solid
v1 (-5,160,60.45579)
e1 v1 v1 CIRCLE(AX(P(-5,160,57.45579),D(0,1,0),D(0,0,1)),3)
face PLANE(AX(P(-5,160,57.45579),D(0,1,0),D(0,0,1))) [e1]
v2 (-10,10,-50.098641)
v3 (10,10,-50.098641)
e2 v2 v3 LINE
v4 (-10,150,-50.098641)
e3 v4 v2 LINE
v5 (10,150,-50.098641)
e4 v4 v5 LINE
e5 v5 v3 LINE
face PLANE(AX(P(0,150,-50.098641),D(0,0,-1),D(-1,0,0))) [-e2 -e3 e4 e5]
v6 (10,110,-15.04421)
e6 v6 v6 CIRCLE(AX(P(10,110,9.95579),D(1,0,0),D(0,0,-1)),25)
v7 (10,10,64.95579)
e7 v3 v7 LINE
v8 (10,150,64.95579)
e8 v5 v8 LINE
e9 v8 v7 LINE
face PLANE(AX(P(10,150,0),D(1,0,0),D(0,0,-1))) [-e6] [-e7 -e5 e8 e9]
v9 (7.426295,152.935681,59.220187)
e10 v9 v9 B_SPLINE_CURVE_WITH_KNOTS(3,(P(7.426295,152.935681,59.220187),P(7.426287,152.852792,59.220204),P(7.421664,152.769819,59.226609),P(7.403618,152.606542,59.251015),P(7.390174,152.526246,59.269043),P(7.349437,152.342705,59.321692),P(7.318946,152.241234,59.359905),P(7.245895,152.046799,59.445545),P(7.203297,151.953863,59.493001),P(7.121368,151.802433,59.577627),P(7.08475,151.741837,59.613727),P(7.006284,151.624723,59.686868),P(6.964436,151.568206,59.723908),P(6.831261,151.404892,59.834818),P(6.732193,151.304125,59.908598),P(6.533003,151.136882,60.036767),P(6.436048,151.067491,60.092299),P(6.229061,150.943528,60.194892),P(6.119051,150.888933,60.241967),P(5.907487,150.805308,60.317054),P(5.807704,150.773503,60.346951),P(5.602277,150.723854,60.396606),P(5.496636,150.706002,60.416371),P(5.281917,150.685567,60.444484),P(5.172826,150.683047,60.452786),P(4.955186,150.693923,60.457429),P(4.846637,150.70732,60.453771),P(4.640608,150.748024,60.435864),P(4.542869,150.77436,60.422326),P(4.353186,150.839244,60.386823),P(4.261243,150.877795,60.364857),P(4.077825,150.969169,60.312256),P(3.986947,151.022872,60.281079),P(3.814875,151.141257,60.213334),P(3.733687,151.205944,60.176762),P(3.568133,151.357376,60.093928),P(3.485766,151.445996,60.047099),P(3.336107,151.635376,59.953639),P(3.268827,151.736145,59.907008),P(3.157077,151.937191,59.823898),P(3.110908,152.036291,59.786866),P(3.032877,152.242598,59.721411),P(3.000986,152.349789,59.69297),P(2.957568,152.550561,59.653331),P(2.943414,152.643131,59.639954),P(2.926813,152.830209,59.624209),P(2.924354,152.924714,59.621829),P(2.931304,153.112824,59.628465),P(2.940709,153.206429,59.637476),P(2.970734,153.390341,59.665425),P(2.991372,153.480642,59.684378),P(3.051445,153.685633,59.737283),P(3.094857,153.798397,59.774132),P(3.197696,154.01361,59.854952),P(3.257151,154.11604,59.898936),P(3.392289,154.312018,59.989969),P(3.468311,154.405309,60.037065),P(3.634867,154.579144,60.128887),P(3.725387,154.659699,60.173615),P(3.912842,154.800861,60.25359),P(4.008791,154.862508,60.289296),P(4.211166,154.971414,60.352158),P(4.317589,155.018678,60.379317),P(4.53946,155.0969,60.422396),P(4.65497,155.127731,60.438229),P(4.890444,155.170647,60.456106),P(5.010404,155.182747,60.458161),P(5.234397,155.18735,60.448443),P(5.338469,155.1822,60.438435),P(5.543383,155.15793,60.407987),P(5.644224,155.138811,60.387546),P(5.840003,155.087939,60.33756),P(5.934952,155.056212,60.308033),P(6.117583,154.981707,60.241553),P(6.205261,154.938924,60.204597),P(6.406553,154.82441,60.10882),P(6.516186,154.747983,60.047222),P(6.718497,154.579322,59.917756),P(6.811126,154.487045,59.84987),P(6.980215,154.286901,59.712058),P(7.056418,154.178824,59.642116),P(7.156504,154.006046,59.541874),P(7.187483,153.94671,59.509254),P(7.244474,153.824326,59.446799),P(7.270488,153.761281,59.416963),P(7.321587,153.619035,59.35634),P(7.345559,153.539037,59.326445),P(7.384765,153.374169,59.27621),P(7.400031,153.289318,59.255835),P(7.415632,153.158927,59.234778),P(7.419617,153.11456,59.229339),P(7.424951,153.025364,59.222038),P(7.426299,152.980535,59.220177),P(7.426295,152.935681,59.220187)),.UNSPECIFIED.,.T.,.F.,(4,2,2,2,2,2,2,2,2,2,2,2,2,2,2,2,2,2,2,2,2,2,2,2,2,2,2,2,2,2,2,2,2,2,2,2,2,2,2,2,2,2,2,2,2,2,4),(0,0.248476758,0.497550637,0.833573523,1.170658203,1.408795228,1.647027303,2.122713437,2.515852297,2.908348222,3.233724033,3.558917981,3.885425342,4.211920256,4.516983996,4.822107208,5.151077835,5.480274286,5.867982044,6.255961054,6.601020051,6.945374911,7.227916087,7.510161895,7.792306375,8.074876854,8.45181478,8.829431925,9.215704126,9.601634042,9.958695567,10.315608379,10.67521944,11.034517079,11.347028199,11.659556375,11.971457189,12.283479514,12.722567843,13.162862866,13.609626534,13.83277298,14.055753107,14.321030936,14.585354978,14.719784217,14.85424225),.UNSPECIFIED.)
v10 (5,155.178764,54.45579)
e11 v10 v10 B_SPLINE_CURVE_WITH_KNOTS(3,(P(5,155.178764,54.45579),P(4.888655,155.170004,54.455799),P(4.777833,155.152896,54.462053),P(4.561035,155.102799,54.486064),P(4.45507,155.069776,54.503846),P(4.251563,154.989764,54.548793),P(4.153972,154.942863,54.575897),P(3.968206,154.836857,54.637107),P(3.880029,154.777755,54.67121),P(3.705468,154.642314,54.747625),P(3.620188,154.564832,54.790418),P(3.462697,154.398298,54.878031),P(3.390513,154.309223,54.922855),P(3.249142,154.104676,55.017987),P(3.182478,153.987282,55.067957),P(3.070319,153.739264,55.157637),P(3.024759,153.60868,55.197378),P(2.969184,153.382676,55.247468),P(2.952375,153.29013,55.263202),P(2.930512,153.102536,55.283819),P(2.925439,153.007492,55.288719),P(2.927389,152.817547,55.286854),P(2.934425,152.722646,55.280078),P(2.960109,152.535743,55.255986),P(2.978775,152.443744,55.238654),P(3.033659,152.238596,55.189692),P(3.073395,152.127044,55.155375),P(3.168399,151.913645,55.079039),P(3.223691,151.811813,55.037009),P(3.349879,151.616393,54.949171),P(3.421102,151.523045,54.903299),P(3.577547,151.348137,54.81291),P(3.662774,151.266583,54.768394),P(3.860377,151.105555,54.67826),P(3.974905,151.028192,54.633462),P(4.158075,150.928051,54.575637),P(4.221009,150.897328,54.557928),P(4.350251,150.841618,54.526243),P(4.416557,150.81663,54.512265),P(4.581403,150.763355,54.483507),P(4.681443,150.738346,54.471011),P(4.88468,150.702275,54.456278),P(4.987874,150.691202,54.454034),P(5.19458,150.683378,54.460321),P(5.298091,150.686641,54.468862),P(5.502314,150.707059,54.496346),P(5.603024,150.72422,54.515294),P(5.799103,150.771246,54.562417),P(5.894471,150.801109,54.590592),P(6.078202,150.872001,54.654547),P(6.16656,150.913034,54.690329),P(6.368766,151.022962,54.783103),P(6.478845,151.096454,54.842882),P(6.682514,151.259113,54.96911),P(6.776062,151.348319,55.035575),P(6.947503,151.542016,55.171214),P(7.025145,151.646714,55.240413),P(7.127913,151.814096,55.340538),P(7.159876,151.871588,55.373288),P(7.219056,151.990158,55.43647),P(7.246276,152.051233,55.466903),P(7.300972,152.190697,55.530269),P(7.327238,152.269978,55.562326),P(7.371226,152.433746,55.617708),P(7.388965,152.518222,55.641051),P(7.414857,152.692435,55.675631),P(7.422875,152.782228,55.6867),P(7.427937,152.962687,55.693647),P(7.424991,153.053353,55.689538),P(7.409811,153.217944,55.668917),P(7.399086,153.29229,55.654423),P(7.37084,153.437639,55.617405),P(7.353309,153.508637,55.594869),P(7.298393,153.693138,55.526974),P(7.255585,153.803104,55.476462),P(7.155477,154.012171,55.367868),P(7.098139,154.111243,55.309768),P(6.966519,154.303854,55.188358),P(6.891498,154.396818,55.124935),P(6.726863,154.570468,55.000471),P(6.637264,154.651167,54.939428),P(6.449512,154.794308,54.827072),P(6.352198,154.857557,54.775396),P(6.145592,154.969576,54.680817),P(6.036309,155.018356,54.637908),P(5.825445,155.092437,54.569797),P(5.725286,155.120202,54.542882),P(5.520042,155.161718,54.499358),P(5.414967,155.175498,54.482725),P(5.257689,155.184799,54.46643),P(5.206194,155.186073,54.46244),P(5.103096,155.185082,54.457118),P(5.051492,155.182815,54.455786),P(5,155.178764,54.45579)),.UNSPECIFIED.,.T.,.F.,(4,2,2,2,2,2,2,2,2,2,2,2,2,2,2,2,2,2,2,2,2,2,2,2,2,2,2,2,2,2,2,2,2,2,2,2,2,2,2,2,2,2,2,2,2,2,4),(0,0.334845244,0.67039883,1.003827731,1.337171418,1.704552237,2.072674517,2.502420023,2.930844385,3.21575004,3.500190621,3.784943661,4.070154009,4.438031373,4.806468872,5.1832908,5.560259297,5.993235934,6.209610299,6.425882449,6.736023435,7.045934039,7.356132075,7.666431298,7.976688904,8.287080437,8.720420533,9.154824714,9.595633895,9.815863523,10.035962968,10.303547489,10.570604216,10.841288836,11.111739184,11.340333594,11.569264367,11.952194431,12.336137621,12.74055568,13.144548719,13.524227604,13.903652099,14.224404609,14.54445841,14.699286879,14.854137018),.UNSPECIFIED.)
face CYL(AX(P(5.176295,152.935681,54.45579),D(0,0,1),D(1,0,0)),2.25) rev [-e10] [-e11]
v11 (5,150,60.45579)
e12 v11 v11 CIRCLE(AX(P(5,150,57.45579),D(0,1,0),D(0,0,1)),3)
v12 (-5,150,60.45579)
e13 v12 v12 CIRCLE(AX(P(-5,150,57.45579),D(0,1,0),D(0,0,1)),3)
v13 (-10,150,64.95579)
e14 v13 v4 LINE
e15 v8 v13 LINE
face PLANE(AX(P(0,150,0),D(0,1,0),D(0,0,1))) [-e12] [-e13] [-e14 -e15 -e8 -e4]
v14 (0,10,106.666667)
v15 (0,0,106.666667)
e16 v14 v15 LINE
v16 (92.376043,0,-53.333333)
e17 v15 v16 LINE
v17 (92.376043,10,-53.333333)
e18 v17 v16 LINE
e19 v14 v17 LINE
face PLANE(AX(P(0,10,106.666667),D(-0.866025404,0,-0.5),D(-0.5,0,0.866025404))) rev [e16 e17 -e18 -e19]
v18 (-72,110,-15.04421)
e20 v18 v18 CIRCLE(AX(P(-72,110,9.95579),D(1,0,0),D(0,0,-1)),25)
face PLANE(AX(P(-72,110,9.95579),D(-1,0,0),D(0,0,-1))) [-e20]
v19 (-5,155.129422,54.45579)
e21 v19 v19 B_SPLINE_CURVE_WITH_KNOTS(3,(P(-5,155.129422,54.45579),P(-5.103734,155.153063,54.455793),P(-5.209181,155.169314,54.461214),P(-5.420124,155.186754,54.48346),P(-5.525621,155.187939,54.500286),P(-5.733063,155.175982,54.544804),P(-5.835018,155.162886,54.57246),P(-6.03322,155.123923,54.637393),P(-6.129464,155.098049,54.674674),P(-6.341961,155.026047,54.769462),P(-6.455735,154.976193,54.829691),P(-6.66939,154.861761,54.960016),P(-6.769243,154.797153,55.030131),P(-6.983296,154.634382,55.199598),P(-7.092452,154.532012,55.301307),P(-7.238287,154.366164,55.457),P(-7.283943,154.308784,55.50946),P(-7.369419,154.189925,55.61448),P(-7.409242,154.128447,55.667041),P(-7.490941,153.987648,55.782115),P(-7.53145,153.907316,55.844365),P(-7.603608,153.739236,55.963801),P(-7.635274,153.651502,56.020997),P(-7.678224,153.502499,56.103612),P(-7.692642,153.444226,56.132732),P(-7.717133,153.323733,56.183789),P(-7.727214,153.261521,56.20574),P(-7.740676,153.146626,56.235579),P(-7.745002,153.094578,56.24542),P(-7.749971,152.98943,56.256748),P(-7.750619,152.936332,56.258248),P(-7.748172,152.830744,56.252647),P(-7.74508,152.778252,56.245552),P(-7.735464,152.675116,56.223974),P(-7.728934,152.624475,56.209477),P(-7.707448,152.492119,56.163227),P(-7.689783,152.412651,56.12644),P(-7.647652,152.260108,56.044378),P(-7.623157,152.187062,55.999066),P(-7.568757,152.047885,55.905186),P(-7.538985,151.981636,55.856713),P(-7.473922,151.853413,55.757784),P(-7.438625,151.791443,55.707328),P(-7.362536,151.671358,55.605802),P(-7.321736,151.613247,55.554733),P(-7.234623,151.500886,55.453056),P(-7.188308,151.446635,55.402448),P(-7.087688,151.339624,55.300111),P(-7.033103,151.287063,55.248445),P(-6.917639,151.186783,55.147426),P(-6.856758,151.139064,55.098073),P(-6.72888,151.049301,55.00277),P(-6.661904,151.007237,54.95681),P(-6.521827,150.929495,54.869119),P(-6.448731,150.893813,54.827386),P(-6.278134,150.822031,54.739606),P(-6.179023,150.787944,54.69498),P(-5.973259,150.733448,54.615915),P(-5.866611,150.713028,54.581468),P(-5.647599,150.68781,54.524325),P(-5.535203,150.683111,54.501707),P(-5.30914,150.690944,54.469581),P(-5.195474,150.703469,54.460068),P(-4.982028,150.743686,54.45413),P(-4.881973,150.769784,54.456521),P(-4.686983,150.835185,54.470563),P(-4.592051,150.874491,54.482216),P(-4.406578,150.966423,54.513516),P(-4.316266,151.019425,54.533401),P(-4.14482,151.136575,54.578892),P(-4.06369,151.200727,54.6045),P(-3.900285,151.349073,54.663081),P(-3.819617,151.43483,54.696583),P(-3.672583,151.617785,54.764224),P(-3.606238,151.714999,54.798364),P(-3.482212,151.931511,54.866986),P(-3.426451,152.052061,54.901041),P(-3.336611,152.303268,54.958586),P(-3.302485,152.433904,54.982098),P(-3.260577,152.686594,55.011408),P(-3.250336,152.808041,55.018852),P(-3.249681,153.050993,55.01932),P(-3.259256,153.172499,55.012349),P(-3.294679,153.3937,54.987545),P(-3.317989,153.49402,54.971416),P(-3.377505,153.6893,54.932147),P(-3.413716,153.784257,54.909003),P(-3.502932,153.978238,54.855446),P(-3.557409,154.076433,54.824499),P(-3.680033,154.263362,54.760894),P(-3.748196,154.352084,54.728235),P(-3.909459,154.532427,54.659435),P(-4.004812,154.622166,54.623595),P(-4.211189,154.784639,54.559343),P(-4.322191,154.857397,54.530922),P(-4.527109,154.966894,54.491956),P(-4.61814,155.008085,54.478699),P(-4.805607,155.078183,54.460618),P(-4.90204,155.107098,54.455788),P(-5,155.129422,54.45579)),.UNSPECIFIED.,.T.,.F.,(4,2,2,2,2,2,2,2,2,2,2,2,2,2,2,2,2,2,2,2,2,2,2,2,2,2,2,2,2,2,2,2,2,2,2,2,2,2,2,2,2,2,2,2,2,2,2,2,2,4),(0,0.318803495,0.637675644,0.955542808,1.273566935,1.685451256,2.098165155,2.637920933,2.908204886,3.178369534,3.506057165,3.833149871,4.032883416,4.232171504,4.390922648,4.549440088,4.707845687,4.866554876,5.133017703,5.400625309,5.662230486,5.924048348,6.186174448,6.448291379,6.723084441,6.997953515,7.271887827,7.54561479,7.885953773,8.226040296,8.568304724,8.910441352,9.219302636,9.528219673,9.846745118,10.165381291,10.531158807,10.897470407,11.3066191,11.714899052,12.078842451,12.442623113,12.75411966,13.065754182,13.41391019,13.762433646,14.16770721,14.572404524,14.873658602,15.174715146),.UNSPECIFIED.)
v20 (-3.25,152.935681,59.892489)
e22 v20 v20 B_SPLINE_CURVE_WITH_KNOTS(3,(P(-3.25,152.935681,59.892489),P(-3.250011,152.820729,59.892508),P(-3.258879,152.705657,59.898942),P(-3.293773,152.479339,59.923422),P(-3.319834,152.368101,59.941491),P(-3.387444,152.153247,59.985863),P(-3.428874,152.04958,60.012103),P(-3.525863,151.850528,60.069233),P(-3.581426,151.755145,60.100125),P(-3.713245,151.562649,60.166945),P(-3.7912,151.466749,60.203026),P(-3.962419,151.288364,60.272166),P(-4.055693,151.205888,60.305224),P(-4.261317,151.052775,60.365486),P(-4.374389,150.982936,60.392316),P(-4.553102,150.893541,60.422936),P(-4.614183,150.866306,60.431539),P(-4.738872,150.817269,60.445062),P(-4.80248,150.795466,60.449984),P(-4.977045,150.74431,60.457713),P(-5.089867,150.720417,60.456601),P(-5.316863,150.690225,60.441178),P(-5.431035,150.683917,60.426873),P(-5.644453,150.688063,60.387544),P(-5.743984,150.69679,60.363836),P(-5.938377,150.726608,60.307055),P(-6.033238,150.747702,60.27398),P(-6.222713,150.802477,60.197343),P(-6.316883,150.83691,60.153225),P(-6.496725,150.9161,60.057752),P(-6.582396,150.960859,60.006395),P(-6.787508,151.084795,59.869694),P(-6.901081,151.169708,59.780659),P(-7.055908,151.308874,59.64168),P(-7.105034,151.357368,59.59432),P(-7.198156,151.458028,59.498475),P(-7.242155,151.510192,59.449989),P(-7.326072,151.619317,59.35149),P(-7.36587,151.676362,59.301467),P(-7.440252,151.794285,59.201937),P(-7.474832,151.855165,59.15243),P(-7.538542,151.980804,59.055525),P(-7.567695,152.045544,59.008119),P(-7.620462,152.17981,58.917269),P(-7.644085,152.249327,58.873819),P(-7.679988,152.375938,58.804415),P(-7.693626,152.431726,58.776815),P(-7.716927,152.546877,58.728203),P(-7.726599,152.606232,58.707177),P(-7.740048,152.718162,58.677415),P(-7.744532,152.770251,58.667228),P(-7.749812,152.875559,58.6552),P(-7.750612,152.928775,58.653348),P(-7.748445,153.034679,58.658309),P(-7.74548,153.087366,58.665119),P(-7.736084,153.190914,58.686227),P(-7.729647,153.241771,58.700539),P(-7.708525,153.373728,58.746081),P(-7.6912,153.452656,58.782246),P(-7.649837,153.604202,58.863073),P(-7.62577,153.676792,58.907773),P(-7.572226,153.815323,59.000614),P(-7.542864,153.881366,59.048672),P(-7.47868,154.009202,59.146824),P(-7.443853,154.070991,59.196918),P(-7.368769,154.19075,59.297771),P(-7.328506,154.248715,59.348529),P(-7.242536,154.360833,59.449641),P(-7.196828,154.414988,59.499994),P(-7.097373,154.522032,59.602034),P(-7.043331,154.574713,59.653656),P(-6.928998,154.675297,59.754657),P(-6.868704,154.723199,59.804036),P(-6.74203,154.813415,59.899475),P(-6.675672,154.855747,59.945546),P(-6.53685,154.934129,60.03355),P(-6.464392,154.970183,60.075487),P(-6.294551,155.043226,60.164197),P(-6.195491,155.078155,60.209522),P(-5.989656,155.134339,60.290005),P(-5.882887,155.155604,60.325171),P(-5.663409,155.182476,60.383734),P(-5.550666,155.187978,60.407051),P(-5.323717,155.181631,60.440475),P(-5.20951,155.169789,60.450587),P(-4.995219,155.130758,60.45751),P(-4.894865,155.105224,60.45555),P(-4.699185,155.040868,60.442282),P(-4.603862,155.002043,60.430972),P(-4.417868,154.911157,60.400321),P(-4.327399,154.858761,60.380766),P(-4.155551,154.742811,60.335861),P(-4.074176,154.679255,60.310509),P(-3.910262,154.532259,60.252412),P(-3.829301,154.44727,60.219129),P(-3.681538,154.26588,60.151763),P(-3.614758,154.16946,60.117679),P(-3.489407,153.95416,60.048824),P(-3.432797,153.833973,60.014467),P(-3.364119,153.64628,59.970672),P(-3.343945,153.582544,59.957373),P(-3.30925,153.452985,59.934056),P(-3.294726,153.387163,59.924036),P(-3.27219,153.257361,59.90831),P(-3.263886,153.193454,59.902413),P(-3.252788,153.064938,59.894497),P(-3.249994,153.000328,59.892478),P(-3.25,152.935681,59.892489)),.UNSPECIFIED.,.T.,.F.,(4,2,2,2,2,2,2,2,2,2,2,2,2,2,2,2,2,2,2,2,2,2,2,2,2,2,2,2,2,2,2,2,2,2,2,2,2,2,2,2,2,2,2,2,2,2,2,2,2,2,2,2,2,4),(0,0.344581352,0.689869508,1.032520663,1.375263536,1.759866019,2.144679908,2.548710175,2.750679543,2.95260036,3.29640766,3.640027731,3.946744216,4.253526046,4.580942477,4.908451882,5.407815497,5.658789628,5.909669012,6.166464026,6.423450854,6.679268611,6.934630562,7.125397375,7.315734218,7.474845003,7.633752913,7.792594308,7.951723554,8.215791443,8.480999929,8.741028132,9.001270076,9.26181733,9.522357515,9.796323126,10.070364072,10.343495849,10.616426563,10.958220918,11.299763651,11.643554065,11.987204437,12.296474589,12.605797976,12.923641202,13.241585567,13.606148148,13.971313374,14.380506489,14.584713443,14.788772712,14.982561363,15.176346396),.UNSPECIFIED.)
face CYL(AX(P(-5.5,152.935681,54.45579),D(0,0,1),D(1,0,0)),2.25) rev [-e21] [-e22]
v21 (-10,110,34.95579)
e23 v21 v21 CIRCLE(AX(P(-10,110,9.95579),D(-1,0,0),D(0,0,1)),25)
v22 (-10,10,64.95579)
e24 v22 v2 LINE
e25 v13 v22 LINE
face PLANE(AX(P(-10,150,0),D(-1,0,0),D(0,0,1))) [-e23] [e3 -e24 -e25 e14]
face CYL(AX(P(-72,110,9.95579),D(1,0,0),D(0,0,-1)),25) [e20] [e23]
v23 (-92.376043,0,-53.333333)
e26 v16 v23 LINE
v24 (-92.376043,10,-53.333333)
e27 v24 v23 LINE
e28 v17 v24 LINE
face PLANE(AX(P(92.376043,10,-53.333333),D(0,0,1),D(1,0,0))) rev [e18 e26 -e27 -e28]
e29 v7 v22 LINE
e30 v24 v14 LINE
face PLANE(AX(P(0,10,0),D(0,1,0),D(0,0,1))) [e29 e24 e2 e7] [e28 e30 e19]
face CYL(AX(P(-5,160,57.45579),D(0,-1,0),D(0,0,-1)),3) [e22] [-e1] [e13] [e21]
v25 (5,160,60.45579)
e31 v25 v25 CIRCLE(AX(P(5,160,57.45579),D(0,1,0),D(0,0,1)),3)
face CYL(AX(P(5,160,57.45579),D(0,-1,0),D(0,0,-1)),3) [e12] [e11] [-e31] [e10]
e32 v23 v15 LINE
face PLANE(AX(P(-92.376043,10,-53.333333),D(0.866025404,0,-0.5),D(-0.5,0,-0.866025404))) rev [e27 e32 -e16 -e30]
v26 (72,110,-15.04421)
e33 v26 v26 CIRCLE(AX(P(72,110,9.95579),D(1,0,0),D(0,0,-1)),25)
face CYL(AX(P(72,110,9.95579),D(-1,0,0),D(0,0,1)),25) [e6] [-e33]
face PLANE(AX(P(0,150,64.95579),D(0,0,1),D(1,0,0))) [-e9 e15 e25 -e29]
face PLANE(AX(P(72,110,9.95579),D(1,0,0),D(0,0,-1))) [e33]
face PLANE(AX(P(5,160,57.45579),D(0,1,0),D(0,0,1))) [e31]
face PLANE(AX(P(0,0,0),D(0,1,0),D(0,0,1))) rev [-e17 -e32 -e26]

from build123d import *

# Parameters (mm, degrees)
BOSS_EXTRUDE1_DEPTH    = 10
SKETCH6_W              = 20
SKETCH6_H              = 64.955790415
SKETCH6_H_2            = 50.098640903
BOSS_EXTRUDE4_DEPTH    = 140
SKETCH7_R              = 25
BOSS_EXTRUDE5_DEPTH    = 62
SKETCH12_R             = 3
BOSS_EXTRUDE6_DEPTH    = 10
CUT_EXTRUDE1_START     = 54.455790306
CUT_EXTRUDE1_OUTLINE_R = 2.25
CUT_EXTRUDE1_DEPTH     = 6.544209694


with BuildPart() as part:
    # Sketch1 → Boss-Extrude1 (new body)
    with BuildSketch(Plane(origin=(0, 0, 0), x_dir=(1, 0, 0), z_dir=(0, 1, 0))):
        Polygon((0, -106.666666667), (92.37604307, 53.333333333), (-92.37604307, 53.333333333), align=None)
    extrude(amount=BOSS_EXTRUDE1_DEPTH)

    # Sketch6 → Boss-Extrude4 (add)
    with BuildSketch(Plane(origin=(0, 10, 0), x_dir=(1, 0, 0), z_dir=(0, 1, 0))):
        with Locations((0, -32.477895208)):
            Rectangle(SKETCH6_W, SKETCH6_H)
        with Locations((0, 25.049320452)):
            Rectangle(SKETCH6_W, SKETCH6_H_2)
    extrude(amount=BOSS_EXTRUDE4_DEPTH)

    # Sketch7 → Boss-Extrude5 (add)
    with BuildSketch(Plane(origin=(10, 0, 0), x_dir=(0, 0, -1), z_dir=(1, 0, 0))):
        with Locations((-9.955790415, 110)):
            Circle(SKETCH7_R)
    boss_extrude5 = extrude(amount=BOSS_EXTRUDE5_DEPTH)

    # Mirror1: Boss-Extrude5 across plane
    add(boss_extrude5.mirror(Plane(origin=(0, 0, 0), x_dir=(0, 0, 1), z_dir=(1, 0, 0))))

    # Sketch12 → Boss-Extrude6 (add)
    with BuildSketch(Plane(origin=(0, 150, 0), x_dir=(1, 0, 0), z_dir=(0, 1, 0))):
        with Locations(Location((5, -57.455790415, 0), (0, 0, 270))):
            Circle(SKETCH12_R)
        with Locations(Location((-5, -57.455790415, 0), (0, 0, 270))):
            Circle(SKETCH12_R)
    extrude(amount=BOSS_EXTRUDE6_DEPTH)

    # Cut-Extrude1: read off the stored shape, not the designer's step
    # Cut-Extrude1 outline → Cut-Extrude1 (cut)
    with BuildSketch(Plane.XY.offset(CUT_EXTRUDE1_START)):
        with Locations((-5.5, 152.935681358)):
            Circle(CUT_EXTRUDE1_OUTLINE_R)
        with Locations((5.176294741, 152.935681358)):
            Circle(CUT_EXTRUDE1_OUTLINE_R)
    extrude(amount=CUT_EXTRUDE1_DEPTH, mode=Mode.SUBTRACT)


solid = part.part
